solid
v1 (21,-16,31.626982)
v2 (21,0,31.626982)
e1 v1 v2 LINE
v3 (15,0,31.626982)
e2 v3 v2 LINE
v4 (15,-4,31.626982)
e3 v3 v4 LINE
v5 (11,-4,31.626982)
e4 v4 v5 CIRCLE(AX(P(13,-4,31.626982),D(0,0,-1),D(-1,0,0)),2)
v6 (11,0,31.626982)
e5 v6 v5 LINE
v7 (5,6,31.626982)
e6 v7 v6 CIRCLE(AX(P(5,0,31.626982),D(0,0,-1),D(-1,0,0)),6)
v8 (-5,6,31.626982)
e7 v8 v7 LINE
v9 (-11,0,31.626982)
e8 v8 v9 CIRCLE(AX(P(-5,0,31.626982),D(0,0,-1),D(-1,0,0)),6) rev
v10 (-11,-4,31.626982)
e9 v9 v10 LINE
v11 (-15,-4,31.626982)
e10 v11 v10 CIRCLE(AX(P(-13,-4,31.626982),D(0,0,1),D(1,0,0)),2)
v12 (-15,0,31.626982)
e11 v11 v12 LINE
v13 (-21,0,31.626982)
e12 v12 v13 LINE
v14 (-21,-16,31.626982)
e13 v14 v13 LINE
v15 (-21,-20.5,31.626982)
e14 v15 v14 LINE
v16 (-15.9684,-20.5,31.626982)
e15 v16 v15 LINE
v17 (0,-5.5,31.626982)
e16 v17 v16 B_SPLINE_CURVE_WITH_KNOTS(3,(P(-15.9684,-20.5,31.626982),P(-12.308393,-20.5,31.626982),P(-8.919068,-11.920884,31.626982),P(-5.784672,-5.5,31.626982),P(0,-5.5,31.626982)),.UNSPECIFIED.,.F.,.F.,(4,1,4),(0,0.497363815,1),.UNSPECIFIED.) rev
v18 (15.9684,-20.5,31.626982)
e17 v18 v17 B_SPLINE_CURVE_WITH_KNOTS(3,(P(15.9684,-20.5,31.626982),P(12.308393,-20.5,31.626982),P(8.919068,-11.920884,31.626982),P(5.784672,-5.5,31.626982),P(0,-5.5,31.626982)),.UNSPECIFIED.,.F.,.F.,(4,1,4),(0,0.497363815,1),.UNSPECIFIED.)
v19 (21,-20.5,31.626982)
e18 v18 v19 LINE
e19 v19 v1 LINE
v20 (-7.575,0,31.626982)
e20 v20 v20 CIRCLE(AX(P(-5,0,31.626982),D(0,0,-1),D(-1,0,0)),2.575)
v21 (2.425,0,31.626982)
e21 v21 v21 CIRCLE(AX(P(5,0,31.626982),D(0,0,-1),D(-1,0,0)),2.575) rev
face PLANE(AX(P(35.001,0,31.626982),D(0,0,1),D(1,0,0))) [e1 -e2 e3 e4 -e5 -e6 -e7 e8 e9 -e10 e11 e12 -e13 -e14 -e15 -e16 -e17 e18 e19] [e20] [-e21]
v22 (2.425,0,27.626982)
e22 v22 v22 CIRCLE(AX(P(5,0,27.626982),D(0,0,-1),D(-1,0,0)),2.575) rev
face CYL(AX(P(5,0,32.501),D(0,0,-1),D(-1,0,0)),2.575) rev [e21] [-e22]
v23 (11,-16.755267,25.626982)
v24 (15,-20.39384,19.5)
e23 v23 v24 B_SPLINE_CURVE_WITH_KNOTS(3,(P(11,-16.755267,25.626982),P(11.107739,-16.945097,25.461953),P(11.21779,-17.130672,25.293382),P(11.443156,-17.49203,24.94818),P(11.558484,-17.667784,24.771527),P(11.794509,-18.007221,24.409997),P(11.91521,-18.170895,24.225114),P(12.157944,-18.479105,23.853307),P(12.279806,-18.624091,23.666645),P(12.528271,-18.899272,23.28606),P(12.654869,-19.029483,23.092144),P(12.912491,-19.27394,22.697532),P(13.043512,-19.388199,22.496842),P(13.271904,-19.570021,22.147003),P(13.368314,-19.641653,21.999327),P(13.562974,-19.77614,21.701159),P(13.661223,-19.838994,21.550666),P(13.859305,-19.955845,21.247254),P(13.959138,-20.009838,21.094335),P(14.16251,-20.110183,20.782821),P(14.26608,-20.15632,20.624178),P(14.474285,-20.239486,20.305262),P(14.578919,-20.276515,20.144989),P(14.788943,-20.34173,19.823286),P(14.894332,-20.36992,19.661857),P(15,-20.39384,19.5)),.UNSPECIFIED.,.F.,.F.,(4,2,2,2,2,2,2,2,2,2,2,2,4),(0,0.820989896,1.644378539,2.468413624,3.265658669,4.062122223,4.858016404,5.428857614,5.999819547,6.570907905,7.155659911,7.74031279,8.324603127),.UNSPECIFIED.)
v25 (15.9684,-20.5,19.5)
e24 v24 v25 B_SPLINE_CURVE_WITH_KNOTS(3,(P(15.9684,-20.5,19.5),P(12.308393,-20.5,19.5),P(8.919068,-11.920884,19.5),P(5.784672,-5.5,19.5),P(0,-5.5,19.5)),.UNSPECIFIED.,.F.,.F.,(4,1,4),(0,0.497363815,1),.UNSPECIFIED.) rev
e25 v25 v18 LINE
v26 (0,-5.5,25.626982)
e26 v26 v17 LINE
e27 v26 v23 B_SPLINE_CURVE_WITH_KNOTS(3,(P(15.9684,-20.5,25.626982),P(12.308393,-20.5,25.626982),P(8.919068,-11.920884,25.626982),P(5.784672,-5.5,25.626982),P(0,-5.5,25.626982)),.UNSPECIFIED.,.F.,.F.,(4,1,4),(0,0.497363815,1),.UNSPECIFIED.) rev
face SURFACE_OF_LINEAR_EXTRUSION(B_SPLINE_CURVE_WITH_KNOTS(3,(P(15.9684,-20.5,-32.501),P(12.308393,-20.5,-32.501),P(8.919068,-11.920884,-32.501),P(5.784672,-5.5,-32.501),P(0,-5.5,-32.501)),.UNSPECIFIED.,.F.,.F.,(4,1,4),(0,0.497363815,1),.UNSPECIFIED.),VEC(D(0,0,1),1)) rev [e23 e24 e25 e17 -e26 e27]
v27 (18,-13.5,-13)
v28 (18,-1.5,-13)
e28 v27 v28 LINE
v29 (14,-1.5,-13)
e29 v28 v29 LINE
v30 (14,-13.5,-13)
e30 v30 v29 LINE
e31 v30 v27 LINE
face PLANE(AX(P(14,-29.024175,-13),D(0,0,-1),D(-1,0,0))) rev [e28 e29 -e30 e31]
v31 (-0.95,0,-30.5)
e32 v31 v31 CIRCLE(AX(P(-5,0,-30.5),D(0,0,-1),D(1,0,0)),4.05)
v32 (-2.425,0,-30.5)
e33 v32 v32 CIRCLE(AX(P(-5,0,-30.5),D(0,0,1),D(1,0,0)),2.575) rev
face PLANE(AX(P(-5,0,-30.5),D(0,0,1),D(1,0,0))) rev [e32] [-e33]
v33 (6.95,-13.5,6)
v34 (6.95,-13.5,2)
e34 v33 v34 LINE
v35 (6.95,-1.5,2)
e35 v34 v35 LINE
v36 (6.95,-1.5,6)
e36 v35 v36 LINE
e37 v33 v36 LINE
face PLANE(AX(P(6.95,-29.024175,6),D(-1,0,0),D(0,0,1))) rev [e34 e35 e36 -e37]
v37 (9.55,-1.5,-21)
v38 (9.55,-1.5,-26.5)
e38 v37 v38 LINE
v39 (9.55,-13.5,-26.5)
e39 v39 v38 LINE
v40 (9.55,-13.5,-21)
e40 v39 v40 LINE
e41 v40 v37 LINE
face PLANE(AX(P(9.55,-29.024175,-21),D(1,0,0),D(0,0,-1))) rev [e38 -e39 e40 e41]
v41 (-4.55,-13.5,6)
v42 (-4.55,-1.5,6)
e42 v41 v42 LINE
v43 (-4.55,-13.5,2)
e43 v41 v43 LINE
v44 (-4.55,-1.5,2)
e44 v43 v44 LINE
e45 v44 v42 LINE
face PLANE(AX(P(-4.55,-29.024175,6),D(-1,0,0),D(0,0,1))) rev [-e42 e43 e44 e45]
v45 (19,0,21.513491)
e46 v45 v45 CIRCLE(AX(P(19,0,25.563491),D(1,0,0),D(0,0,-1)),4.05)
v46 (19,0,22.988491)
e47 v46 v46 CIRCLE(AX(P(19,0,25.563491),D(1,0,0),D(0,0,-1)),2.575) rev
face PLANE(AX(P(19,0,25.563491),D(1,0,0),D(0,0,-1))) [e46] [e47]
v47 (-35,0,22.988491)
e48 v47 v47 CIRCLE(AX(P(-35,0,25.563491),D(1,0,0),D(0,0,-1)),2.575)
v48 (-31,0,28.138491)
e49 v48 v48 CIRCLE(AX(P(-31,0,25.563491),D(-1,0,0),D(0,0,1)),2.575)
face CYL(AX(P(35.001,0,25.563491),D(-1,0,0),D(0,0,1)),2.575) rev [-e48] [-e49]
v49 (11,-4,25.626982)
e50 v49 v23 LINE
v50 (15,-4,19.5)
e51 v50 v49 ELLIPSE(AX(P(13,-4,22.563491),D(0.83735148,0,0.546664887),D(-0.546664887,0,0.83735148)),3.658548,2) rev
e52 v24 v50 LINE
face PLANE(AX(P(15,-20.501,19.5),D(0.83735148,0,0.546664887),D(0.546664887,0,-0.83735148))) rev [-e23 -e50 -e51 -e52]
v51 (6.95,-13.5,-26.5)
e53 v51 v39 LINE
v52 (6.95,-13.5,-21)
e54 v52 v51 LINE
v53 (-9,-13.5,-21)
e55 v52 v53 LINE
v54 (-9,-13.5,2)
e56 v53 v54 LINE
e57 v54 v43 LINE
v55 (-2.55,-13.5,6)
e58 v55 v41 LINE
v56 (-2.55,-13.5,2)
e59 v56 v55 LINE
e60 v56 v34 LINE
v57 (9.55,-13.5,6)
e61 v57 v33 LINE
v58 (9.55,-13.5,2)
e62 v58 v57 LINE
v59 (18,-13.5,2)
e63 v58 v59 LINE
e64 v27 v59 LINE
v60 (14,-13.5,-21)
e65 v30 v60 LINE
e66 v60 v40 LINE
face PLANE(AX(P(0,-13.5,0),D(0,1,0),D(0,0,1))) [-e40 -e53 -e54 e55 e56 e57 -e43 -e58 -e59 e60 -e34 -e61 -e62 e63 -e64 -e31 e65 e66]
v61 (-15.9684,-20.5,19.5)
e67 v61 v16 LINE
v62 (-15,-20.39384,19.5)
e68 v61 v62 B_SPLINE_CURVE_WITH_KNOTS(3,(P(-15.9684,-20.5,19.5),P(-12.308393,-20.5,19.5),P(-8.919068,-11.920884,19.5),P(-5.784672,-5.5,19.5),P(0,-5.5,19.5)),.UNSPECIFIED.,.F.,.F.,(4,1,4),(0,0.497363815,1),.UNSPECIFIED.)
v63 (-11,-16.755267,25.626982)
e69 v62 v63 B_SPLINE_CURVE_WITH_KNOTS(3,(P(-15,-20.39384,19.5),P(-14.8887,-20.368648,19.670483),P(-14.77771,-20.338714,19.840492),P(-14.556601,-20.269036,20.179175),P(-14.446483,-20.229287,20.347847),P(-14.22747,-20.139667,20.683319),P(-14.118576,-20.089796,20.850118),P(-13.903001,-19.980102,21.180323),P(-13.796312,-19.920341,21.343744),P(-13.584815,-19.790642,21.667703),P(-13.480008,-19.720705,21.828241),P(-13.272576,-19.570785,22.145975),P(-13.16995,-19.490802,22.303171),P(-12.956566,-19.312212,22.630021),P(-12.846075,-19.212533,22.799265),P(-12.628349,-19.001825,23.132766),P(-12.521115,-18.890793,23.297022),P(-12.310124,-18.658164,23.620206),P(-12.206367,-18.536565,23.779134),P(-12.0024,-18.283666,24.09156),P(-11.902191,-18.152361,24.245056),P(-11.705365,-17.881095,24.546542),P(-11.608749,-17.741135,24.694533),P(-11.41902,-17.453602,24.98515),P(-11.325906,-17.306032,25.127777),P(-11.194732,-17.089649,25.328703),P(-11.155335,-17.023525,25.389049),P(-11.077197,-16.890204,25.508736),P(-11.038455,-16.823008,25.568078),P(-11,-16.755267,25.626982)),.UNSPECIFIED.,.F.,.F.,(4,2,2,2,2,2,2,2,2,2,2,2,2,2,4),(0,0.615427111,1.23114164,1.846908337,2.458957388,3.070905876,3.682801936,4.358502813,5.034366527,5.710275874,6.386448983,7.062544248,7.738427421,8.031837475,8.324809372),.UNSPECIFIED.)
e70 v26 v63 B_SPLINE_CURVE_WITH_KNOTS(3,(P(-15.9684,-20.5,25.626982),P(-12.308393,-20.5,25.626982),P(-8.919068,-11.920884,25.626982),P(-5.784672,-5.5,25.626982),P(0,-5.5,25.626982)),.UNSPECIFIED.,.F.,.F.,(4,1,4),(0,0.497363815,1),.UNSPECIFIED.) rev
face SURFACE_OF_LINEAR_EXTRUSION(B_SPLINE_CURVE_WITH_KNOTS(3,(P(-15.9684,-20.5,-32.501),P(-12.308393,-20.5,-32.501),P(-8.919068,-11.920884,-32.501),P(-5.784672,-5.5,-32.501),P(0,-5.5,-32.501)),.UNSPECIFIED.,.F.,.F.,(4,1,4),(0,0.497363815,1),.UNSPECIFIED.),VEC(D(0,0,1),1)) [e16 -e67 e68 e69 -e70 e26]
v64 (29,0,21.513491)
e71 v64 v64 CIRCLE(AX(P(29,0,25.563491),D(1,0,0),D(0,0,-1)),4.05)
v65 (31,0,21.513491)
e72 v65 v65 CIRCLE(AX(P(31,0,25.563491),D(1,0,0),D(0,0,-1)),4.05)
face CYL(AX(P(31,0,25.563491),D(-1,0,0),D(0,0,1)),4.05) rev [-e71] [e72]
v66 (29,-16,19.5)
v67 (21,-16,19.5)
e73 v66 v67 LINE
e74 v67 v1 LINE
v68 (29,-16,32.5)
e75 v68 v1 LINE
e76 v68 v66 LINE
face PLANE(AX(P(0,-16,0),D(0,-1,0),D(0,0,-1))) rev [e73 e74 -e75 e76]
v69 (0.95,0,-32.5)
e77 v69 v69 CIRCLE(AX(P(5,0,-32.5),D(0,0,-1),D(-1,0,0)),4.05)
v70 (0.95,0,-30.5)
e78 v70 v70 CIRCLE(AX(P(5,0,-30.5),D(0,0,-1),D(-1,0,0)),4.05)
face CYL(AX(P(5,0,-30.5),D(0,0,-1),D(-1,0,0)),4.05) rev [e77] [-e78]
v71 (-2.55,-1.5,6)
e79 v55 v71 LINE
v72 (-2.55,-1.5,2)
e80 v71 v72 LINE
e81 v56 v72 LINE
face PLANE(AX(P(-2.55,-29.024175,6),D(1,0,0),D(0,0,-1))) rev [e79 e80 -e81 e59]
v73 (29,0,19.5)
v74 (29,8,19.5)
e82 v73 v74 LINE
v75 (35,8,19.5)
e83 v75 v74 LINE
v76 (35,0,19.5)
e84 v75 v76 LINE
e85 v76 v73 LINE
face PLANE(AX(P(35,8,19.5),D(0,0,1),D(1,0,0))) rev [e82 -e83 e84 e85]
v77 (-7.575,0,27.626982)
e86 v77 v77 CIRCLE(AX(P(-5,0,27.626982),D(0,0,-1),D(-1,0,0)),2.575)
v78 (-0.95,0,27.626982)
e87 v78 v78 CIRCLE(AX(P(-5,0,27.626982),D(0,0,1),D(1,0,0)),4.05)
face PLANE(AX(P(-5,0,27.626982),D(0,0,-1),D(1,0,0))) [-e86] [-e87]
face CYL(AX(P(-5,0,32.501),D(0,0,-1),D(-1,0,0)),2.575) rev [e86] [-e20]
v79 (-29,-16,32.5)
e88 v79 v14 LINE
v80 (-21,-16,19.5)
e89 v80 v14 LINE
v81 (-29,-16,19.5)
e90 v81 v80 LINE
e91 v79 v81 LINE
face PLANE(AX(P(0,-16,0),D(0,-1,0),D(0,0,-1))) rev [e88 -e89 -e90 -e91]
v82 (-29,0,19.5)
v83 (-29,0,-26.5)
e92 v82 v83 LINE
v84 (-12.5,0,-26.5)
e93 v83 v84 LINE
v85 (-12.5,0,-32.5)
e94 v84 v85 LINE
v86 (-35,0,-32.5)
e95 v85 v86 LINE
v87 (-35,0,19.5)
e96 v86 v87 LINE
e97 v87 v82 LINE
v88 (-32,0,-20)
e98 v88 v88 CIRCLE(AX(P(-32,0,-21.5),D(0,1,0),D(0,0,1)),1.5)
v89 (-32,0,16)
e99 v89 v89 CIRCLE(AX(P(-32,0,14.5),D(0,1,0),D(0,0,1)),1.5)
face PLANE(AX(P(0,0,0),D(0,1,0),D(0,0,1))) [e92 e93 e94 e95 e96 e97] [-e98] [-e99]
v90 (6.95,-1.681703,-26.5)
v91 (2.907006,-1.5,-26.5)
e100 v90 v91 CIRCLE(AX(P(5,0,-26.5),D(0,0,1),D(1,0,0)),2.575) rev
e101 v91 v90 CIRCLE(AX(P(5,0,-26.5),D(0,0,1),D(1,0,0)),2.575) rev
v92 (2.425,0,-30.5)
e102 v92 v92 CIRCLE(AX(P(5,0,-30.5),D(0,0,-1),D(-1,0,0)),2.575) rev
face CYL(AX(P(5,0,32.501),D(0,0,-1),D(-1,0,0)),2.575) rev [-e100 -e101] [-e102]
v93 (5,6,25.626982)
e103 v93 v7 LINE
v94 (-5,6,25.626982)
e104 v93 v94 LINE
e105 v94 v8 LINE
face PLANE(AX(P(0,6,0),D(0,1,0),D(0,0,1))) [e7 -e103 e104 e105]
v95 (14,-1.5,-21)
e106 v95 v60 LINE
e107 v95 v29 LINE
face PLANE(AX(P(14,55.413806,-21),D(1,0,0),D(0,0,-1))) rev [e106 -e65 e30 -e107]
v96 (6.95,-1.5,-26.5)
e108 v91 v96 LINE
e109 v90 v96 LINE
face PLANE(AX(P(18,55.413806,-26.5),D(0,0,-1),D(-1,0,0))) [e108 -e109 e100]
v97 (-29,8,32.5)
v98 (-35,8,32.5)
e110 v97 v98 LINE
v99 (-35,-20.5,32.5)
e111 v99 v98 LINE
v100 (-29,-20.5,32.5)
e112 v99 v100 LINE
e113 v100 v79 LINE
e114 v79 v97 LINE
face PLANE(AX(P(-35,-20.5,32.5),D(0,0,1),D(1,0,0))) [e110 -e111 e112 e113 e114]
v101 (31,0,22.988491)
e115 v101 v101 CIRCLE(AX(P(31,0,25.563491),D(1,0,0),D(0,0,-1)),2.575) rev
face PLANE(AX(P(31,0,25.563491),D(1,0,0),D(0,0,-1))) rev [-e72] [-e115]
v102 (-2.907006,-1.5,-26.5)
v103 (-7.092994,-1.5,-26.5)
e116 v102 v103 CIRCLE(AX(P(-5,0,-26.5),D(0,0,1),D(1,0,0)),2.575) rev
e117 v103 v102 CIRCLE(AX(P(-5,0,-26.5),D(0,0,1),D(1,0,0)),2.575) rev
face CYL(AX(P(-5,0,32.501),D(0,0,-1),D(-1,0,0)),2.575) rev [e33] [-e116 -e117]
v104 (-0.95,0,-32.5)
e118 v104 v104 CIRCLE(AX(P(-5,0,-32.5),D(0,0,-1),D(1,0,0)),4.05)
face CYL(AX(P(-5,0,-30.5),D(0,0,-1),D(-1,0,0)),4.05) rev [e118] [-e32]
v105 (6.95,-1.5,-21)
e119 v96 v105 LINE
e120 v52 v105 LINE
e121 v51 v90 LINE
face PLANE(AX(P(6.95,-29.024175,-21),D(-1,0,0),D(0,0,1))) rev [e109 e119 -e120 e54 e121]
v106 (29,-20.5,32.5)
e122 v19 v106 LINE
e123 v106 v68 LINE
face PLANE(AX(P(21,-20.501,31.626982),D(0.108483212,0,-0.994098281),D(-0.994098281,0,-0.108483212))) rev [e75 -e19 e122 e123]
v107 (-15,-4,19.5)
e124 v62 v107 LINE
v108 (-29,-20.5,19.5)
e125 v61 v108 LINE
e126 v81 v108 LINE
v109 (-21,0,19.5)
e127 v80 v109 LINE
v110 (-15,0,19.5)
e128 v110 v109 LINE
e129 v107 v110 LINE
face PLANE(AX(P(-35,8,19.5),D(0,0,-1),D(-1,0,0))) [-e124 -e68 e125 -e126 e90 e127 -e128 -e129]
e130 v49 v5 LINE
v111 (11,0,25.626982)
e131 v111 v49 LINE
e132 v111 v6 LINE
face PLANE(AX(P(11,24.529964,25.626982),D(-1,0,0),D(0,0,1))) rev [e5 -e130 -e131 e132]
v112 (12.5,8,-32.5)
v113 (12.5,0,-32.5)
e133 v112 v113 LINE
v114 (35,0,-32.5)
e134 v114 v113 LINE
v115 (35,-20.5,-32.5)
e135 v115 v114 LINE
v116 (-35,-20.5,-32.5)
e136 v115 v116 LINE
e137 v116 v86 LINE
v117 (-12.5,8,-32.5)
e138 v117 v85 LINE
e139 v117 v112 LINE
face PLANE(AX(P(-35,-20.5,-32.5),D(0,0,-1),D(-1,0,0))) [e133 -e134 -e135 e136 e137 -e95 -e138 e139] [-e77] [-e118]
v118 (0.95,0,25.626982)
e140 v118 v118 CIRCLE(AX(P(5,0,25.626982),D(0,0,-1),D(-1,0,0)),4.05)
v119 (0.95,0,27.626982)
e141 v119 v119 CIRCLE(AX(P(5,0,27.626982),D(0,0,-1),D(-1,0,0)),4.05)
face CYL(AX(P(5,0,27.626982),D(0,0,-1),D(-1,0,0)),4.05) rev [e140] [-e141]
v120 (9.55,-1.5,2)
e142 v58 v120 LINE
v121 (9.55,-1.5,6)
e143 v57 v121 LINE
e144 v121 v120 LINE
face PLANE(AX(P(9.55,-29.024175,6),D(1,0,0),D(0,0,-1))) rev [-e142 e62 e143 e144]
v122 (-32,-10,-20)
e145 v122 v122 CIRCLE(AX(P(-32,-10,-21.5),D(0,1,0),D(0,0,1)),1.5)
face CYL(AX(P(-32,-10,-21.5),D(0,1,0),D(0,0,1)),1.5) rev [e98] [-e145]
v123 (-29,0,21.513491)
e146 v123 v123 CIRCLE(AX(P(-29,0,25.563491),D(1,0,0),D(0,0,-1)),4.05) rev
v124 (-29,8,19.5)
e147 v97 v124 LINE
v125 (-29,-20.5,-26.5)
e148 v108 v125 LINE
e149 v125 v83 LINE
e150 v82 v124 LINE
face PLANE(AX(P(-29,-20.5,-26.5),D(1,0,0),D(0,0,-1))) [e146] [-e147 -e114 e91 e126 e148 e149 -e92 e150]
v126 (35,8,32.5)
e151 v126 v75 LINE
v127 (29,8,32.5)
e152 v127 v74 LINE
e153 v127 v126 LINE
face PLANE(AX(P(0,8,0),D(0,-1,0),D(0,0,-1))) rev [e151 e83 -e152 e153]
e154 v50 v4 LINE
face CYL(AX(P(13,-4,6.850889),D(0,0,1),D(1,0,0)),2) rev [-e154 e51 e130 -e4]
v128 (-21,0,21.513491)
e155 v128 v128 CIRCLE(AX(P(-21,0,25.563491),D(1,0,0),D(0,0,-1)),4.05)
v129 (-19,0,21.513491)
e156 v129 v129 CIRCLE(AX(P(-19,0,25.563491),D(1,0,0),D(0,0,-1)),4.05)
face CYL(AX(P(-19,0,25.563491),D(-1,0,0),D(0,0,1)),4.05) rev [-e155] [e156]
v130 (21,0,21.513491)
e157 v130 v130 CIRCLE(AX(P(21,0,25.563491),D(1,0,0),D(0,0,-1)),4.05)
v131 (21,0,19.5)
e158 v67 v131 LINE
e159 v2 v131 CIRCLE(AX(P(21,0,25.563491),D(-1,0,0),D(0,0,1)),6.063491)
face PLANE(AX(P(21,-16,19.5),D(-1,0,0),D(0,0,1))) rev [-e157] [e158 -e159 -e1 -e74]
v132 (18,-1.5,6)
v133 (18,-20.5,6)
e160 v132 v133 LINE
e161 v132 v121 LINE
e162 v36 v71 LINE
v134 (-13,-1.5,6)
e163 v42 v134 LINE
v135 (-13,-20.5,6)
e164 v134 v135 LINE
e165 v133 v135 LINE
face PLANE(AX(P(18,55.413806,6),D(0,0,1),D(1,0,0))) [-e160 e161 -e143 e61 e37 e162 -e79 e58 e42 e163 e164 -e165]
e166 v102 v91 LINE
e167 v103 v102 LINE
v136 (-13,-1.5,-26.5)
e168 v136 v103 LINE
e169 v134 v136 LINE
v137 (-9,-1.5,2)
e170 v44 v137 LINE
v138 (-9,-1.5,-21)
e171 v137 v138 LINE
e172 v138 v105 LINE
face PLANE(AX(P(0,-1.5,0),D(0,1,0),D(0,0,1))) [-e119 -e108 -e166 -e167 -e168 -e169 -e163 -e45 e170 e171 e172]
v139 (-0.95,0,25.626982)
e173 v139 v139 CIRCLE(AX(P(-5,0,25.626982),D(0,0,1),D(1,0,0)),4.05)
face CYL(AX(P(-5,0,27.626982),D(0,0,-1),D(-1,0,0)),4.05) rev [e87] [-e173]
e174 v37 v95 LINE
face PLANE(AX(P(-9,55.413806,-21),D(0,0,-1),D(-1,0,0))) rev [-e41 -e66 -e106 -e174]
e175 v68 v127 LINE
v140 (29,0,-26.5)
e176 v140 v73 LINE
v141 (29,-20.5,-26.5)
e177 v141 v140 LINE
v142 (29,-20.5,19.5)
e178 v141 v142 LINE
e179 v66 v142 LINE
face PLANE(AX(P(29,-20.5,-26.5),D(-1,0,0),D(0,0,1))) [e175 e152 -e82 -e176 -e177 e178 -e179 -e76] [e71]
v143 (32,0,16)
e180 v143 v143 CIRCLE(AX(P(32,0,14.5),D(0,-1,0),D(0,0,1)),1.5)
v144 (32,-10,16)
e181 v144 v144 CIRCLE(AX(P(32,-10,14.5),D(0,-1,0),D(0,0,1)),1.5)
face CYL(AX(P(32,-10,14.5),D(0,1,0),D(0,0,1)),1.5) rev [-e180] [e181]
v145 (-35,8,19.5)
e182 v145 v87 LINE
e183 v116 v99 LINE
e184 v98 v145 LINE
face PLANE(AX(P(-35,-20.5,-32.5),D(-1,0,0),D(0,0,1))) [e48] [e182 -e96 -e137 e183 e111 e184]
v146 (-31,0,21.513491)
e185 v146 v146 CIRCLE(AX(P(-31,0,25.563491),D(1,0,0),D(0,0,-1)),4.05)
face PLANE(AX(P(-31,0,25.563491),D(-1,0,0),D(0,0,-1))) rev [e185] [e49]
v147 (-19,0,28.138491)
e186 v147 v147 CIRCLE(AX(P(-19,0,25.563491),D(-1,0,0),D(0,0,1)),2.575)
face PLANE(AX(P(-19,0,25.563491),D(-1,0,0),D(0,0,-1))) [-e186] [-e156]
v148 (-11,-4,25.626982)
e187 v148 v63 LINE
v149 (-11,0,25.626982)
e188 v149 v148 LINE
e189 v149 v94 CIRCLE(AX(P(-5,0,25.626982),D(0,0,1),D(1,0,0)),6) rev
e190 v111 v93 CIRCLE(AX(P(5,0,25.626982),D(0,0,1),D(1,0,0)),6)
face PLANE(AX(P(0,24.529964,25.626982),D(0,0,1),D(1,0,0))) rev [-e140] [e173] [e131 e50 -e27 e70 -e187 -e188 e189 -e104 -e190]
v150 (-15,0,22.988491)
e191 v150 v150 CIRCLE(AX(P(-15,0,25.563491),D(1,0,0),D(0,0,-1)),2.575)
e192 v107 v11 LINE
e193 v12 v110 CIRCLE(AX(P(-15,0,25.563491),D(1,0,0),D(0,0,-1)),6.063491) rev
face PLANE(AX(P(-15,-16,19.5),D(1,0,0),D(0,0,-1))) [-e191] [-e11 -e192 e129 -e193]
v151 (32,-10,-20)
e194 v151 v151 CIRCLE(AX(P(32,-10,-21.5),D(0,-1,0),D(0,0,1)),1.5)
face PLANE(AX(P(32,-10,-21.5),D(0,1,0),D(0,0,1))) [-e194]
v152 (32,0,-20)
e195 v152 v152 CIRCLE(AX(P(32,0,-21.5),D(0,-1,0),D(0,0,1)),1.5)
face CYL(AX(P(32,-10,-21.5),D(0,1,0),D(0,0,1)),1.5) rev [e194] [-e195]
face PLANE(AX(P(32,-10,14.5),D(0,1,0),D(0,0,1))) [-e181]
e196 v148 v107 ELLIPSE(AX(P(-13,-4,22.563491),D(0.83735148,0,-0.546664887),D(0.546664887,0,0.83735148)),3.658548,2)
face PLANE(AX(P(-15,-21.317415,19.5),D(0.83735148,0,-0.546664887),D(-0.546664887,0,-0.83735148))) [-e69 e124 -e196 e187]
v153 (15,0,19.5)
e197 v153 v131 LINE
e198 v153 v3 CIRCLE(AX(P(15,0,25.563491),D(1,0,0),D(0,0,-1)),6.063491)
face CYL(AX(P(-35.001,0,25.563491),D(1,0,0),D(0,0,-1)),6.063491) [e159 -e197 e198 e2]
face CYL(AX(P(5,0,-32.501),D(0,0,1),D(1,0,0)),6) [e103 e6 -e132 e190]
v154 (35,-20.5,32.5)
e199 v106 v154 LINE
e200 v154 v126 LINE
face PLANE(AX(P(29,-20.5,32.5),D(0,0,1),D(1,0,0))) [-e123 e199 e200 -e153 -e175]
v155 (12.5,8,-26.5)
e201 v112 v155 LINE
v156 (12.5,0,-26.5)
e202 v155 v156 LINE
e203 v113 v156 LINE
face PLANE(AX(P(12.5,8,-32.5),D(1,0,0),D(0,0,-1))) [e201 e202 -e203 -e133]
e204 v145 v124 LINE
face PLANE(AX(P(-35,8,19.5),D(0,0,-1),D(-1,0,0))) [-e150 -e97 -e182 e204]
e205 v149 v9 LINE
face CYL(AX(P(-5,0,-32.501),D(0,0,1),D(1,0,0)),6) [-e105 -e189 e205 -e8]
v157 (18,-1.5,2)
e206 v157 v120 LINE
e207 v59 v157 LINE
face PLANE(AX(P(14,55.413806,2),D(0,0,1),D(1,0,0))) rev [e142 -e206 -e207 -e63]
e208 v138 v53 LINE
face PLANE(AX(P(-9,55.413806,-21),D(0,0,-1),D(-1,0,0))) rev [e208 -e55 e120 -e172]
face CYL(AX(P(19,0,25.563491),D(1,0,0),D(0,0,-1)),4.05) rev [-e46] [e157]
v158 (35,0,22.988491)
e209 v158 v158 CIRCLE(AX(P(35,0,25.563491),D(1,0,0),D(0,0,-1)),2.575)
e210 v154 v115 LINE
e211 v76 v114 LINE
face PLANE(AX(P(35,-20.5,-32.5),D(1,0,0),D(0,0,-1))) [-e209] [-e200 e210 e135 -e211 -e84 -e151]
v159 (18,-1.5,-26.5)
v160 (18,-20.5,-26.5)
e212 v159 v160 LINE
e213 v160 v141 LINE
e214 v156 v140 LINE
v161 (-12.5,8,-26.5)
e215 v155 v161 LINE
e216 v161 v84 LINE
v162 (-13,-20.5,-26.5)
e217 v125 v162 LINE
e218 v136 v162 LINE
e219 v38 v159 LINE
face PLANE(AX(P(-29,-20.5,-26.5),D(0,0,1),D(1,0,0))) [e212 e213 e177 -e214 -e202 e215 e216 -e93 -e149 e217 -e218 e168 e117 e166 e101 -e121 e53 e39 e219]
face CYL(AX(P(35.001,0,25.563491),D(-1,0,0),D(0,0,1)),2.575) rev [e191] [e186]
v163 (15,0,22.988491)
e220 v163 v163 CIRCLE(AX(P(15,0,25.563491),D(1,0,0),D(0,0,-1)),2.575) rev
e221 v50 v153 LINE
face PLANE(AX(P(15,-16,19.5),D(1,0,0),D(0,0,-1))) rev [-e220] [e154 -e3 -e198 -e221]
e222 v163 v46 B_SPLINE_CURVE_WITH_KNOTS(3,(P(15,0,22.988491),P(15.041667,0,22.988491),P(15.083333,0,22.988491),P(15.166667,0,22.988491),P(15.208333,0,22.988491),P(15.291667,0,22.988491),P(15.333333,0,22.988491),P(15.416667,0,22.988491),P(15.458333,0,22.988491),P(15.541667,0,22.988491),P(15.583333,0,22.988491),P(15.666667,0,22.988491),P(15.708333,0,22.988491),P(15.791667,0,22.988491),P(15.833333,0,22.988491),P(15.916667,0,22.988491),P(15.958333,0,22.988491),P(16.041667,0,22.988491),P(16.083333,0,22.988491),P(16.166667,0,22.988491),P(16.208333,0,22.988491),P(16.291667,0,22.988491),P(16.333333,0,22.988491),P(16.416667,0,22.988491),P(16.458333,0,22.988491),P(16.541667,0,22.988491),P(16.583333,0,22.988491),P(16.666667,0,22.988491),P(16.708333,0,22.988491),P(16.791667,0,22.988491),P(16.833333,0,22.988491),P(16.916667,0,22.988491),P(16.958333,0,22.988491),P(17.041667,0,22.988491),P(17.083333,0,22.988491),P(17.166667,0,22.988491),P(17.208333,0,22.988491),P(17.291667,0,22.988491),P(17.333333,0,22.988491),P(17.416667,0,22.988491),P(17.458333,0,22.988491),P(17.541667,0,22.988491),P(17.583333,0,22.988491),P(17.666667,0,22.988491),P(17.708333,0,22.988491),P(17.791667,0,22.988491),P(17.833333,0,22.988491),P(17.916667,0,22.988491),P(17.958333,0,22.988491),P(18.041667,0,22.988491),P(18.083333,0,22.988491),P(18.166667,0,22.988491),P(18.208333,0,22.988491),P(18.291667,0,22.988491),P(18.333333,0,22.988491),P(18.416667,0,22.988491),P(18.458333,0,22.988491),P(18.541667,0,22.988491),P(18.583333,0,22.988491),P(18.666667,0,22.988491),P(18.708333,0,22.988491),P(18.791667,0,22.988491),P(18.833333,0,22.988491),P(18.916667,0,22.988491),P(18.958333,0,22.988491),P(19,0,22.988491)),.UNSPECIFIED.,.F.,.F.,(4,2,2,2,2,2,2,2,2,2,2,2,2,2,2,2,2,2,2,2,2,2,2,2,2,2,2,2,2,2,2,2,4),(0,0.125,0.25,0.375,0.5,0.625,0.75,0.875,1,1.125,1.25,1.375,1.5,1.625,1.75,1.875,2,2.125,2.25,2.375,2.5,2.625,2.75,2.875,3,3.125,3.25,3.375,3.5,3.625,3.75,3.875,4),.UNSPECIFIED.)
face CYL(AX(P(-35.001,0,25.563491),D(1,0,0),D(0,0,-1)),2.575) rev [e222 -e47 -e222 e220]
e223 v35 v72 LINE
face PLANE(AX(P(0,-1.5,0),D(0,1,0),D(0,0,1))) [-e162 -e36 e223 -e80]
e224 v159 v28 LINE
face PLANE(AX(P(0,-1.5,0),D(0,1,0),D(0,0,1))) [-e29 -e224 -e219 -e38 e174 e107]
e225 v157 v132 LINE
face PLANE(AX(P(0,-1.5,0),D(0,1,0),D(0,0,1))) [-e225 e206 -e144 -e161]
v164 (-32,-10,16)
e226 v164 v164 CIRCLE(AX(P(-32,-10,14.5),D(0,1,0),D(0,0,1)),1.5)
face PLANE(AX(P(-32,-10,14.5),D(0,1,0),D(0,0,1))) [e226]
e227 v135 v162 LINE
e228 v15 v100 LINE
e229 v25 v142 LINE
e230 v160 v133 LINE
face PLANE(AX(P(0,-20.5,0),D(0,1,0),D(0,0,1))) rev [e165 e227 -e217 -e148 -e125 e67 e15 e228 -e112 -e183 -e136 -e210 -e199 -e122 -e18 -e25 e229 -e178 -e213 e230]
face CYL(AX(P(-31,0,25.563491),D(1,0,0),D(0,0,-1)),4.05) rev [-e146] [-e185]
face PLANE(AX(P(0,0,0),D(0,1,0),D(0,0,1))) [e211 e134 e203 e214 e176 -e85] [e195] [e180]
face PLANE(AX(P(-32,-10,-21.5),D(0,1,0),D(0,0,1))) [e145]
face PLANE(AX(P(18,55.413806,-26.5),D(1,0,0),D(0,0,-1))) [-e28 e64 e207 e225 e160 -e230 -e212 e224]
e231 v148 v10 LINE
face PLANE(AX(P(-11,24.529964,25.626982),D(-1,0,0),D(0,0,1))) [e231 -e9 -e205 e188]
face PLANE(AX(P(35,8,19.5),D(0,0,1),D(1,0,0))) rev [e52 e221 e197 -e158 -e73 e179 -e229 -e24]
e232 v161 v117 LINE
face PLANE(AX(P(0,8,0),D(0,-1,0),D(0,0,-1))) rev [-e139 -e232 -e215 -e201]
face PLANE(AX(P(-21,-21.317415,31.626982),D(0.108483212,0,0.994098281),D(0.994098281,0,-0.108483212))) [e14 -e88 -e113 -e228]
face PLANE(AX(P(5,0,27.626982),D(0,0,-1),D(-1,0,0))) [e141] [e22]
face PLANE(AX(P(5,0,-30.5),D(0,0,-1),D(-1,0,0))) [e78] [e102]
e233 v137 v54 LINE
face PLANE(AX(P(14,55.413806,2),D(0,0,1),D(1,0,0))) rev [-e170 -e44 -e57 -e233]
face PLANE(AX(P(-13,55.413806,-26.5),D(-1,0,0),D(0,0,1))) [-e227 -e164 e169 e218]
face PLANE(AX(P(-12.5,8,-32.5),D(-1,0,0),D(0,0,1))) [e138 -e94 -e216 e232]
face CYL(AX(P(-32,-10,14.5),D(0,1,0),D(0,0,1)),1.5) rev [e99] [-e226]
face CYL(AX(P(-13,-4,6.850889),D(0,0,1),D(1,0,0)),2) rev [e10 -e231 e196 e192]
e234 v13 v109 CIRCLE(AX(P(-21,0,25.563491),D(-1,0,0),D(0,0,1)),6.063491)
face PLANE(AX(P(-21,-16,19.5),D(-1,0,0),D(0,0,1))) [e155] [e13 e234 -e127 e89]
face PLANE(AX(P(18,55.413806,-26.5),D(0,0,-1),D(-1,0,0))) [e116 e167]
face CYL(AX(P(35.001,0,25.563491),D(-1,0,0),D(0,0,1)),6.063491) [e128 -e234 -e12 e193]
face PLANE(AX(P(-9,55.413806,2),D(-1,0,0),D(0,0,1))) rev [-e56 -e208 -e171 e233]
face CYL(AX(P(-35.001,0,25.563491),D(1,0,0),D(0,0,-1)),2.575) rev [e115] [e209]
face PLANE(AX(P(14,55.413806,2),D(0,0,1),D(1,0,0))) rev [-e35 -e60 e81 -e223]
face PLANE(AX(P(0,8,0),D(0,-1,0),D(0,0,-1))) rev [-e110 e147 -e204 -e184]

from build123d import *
from build123d.topology import SkipClean

# Parameters (mm, degrees)
BOSS_EXTRUDE1_DEPTH   = 20.5
SKETCH2_W             = 25
SKETCH2_H             = 6
BOSS_EXTRUDE2_DEPTH   = 8
CUT_EXTRUDE1_REACH    = 78.618
SKETCH3_R             = 2.575
SKETCH4_R             = 4.05
CUT_EXTRUDE2_DEPTH    = 2
SKETCH5_W             = 23
SKETCH5_H             = 23
BOSS_EXTRUDE3_DEPTH   = 7
SKETCH16_W            = 31
SKETCH16_H            = 32.5
SKETCH16_W_2          = 23
SKETCH16_H_2          = 23
BOSS_EXTRUDE6_DEPTH   = 19
SKETCH18_W            = 2.6
SKETCH18_H            = 5.5
SKETCH18_H_2          = 4
SKETCH18_W_2          = 2
SKETCH18_W_3          = 4
SKETCH18_H_3          = 15
CUT_EXTRUDE10_DEPTH   = 12
SKETCH8_W             = 6
SKETCH8_H             = 13
BOSS_EXTRUDE4_DEPTH   = 8
CUT_EXTRUDE_X_REACH   = 81.853
SKETCH7_R             = 2.575
SKETCH9_R             = 4.05
CUT_EXTRUDE4_DEPTH    = 2
SKETCH10_W            = 29
SKETCH10_H            = 13
BOSS_EXTRUDE5_DEPTH   = 28.5
SKETCH12_W            = 8
SKETCH12_H            = 13
SKETCH12_W_2          = 15
CUT_EXTRUDE6_DEPTH    = 24
CUT_EXTRUDE7_REACH    = 69.915
SKETCH13_R            = 2.575
CUT_EXTRUDE8_START    = -2
SKETCH14_R            = 4.05
CUT_EXTRUDE8_DEPTH    = 2
CUT_EXTRUDE9_REACH    = 69.915
SKETCH23_W            = 11
SKETCH23_H            = 6
BOSS_EXTRUDE8_DEPTH   = 22
CUT_EXTRUDE12_REACH   = 67.949
SKETCH21_R            = 2.575
SKETCH22_R            = 4.05
CUT_EXTRUDE13_DEPTH   = 2
CUT_EXTRUDE14_REACH   = 78.618
BOSS_EXTRUDE9_REACH   = 77.878
CUT_EXTRUDE15_REACH   = 56.621
CUT_EXTRUDE16_REACH   = 78.618
CUT_EXTRUDE18_REACH   = 55.453
MIRROR1_START         = 19.5
MIRROR1_OUTLINE_R     = 4.05
MIRROR1_DEPTH         = 13
MIRROR1_START_2       = 27.626981996
MIRROR1_2_OUTLINE_R   = 4.05
MIRROR1_2_OUTLINE_R_2 = 2.575
MIRROR1_2_DEPTH       = 4
MIRROR1_START_3       = -11
MIRROR1_3_OUTLINE_W   = 6
MIRROR1_3_OUTLINE_H   = 0.873018004
MIRROR1_3_DEPTH       = 11
MIRROR1_START_4       = -35
MIRROR1_4_OUTLINE_R   = 2.575
MIRROR1_4_DEPTH       = 20
MIRROR1_START_5       = -31
MIRROR1_5_OUTLINE_R   = 4.05
MIRROR1_5_OUTLINE_R_2 = 2.575
MIRROR1_5_DEPTH       = 12
MIRROR1_START_6       = -21
MIRROR1_6_DEPTH       = 6
MIRROR1_START_7       = -19
MIRROR1_7_DEPTH       = 4
MIRROR1_8_DEPTH       = 21
SKETCH33_R            = 1.5
CUT_EXTRUDE19_DEPTH   = 10


with BuildPart() as part:
    # Sketch1 → Boss-Extrude1 (new body)
    with BuildSketch(Plane(origin=(0, 0, 0), x_dir=(1, 0, 0), z_dir=(0, 1, 0))):
        Polygon((-29, 26.5), (-29, -32.5), (-35, -32.5), (-35, 32.5), (35, 32.5), (35, -32.5), (29, -32.5), (29, 26.5), align=None)
    extrude(amount=-BOSS_EXTRUDE1_DEPTH)

    # Sketch2 → Boss-Extrude2 (add)
    with BuildSketch(Plane(origin=(0, 0, 0), x_dir=(-1, 0, 0), z_dir=(0, -1, 0))):
        with Locations((0, 29.5)):
            Rectangle(SKETCH2_W, SKETCH2_H)
    extrude(amount=-BOSS_EXTRUDE2_DEPTH)

    # Sketch3 → Cut-Extrude1 (cut, up to next)
    with BuildSketch(Plane(origin=(0, 0, -32.5), x_dir=(-1, 0, 0), z_dir=(0, 0, -1)), mode=Mode.PRIVATE) as cut_extrude1_sk1:
        with Locations((-5, 0)):
            Circle(SKETCH3_R)
    cut_extrude1_tool1 = extrude(cut_extrude1_sk1.sketch, amount=-CUT_EXTRUDE1_REACH, mode=Mode.PRIVATE) & part.part
    # Sketch3 → Cut-Extrude1 (cut, up to next)
    with BuildSketch(Plane(origin=(0, 0, -32.5), x_dir=(-1, 0, 0), z_dir=(0, 0, -1)), mode=Mode.PRIVATE) as cut_extrude1_sk2:
        with Locations(Location((5, 0, 0), (0, 0, 180))):
            Circle(SKETCH3_R)
    cut_extrude1_tool2 = extrude(cut_extrude1_sk2.sketch, amount=-CUT_EXTRUDE1_REACH, mode=Mode.PRIVATE) & part.part
    add(cut_extrude1_tool1.solids().sort_by_distance((5, 0, -32.5))[0], mode=Mode.SUBTRACT)
    add(cut_extrude1_tool2.solids().sort_by_distance((-5, 0, -32.5))[0], mode=Mode.SUBTRACT)

    # Sketch4 → Cut-Extrude2 (cut)
    with BuildSketch(Plane(origin=(0, 0, -32.5), x_dir=(-1, 0, 0), z_dir=(0, 0, -1))):
        with Locations((-5, 0)):
            Circle(SKETCH4_R)
        with Locations(Location((5, 0, 0), (0, 0, 180))):
            Circle(SKETCH4_R)
    extrude(amount=-CUT_EXTRUDE2_DEPTH, mode=Mode.SUBTRACT)



with BuildPart() as body_2:
    # Sketch5 → Boss-Extrude3 (new body)
    with BuildSketch(Plane(origin=(0, -20.5, 0), x_dir=(1, 0, 0), z_dir=(0, 1, 0))):
        with Locations((2.5, 9.5)):
            Rectangle(SKETCH5_W, SKETCH5_H)
    extrude(amount=BOSS_EXTRUDE3_DEPTH)


with BuildPart() as part_1:
    add(part.part)

    add(body_2.part)  # Boss-Extrude6 merges body 2
    # Sketch16 → Boss-Extrude6 (add)
    with BuildSketch(Plane.XZ.offset(20.5)):
        with Locations((2.5, -10.25)):
            Rectangle(SKETCH16_W, SKETCH16_H)
        with Locations((2.5, -9.5)):
            Rectangle(SKETCH16_W_2, SKETCH16_H_2, mode=Mode.SUBTRACT)
    extrude(amount=-BOSS_EXTRUDE6_DEPTH)

    # Sketch18 → Cut-Extrude10 (cut)
    with BuildSketch(Plane(origin=(0, -1.5, 0), x_dir=(1, 0, 0), z_dir=(0, 1, 0))):
        with Locations((8.25, 23.75)):
            Rectangle(SKETCH18_W, SKETCH18_H)
        with Locations((8.25, -4)):
            Rectangle(SKETCH18_W, SKETCH18_H_2)
        with Locations((-3.55, -4)):
            Rectangle(SKETCH18_W_2, SKETCH18_H_2)
        with Locations((16, 5.5)):
            Rectangle(SKETCH18_W_3, SKETCH18_H_3)
    extrude(amount=-CUT_EXTRUDE10_DEPTH, mode=Mode.SUBTRACT)

    # Sketch8 → Boss-Extrude4 (add)
    with BuildSketch(Plane(origin=(0, 0, 0), x_dir=(1, 0, 0), z_dir=(0, 1, 0))):
        with Locations((32, -26)):
            Rectangle(SKETCH8_W, SKETCH8_H)
    extrude(amount=BOSS_EXTRUDE4_DEPTH)

    # Sketch7 → Cut-Extrude x (cut, up to next)
    with BuildSketch(Plane(origin=(35, 0, 0), x_dir=(0, 0, -1), z_dir=(1, 0, 0)), mode=Mode.PRIVATE) as cut_extrude_x_sk1:
        with Locations((-25.563490998, 0)):
            Circle(SKETCH7_R)
    cut_extrude_x_tool1 = extrude(cut_extrude_x_sk1.sketch, amount=-CUT_EXTRUDE_X_REACH, mode=Mode.PRIVATE) & part_1.part
    add(cut_extrude_x_tool1.solids().sort_by_distance((35, 0, 25.563491))[0], mode=Mode.SUBTRACT)

    # Sketch9 → Cut-Extrude4 (cut)
    with BuildSketch(Plane(origin=(29, 0, 0), x_dir=(0, 0, -1), z_dir=(1, 0, 0))):
        with Locations((-25.563490998, 0)):
            Circle(SKETCH9_R)
    extrude(amount=CUT_EXTRUDE4_DEPTH, mode=Mode.SUBTRACT)

    # Sketch10 → Boss-Extrude5 (add)
    with BuildSketch(Plane.XZ.offset(20.5)):
        with Locations((14.5, 26)):
            Rectangle(SKETCH10_W, SKETCH10_H)
    extrude(amount=-BOSS_EXTRUDE5_DEPTH)

    # Sketch12 → Cut-Extrude6 (cut)
    with BuildSketch(Plane(origin=(0, 8, 0), x_dir=(1, 0, 0), z_dir=(0, 1, 0))):
        with Locations((25, -26)):
            Rectangle(SKETCH12_W, SKETCH12_H)
        with Locations((7.5, -26)):
            Rectangle(SKETCH12_W_2, SKETCH12_H)
    extrude(amount=-CUT_EXTRUDE6_DEPTH, mode=Mode.SUBTRACT)

    # Sketch13 → Cut-Extrude7 (cut, up to next)
    with BuildSketch(Plane(origin=(21, 0, 0), x_dir=(0, 0, -1), z_dir=(1, 0, 0)), mode=Mode.PRIVATE) as cut_extrude7_sk1:
        with Locations((-25.563490998, 0)):
            Circle(SKETCH13_R)
    cut_extrude7_tool1 = extrude(cut_extrude7_sk1.sketch, amount=-CUT_EXTRUDE7_REACH, mode=Mode.PRIVATE) & part_1.part
    add(cut_extrude7_tool1.solids().sort_by_distance((21, 0, 25.563491))[0], mode=Mode.SUBTRACT)

    # Sketch14 → Cut-Extrude8 (cut)
    with BuildSketch(Plane(origin=(21, 0, 0), x_dir=(0, 0, -1), z_dir=(1, 0, 0)).offset(CUT_EXTRUDE8_START)):
        with Locations((-25.563490998, 0)):
            Circle(SKETCH14_R)
    extrude(amount=CUT_EXTRUDE8_DEPTH, mode=Mode.SUBTRACT)

    # Sketch15 → Cut-Extrude9 (cut, up to next)
    with BuildSketch(Plane(origin=(21, 0, 0), x_dir=(0, 0, -1), z_dir=(1, 0, 0)), mode=Mode.PRIVATE) as cut_extrude9_sk1:
        with BuildLine():
            Line((-19.5, 8), (-19.5, 0))
            ThreePointArc((-19.5, 0), (-25.563490998, 6.063490998), (-31.626981996, 0))
            Line((-31.626981996, 0), (-31.626981996, -16))
            Line((-31.626981996, -16), (-32.5, -16))
            Line((-32.5, -16), (-32.5, 8))
            Line((-32.5, 8), (-19.5, 8))
        make_face()
    cut_extrude9_tool1 = extrude(cut_extrude9_sk1.sketch, amount=-CUT_EXTRUDE9_REACH, mode=Mode.PRIVATE) & part_1.part
    add(cut_extrude9_tool1.solids().sort_by_distance((21, 4, 19.772947))[0], mode=Mode.SUBTRACT)

    # Sketch23 → Boss-Extrude8 (add)
    with BuildSketch(Plane(origin=(0, -16, 0), x_dir=(1, 0, 0), z_dir=(0, 1, 0))):
        with Locations((5.5, -28.626981996)):
            Rectangle(SKETCH23_W, SKETCH23_H)
    extrude(amount=BOSS_EXTRUDE8_DEPTH)

    # Sketch21 → Cut-Extrude12 (cut, up to next)
    with BuildSketch(Plane(origin=(0, 0, 19.5), x_dir=(-1, 0, 0), z_dir=(0, 0, -1)), mode=Mode.PRIVATE) as cut_extrude12_sk1:
        with Locations((-5, 0)):
            Circle(SKETCH21_R)
    cut_extrude12_tool1 = extrude(cut_extrude12_sk1.sketch, amount=-CUT_EXTRUDE12_REACH, mode=Mode.PRIVATE) & part_1.part
    add(cut_extrude12_tool1.solids().sort_by_distance((5, 0, 19.5))[0], mode=Mode.SUBTRACT)

    # Sketch22 → Cut-Extrude13 (cut)
    with BuildSketch(Plane(origin=(0, 0, 25.626981996), x_dir=(-1, 0, 0), z_dir=(0, 0, -1))):
        with Locations((-5, 0)):
            Circle(SKETCH22_R)
    extrude(amount=-CUT_EXTRUDE13_DEPTH, mode=Mode.SUBTRACT)

    # Sketch25 → Cut-Extrude14 (cut, up to next)
    with BuildSketch(Plane.XY.offset(32.5), mode=Mode.PRIVATE) as cut_extrude14_sk1:
        with BuildLine():
            Line((5, 6), (11, 6))
            Line((11, 6), (11, 0))
            ThreePointArc((11, 0), (9.242640687, 4.242640687), (5, 6))
        make_face()
    cut_extrude14_tool1 = extrude(cut_extrude14_sk1.sketch, amount=-CUT_EXTRUDE14_REACH, mode=Mode.PRIVATE) & part_1.part
    add(cut_extrude14_tool1.solids().sort_by_distance((9.659792, 4.659792, 32.5))[0], mode=Mode.SUBTRACT)

    # Boss-Extrude9: up to this face of the body (flat: up to its plane)
    boss_extrude9_end = Plane(part_1.part.faces().sort_by_distance((15.983443709, -13.905629139, 19.5))[0])
    # Sketch26 → Boss-Extrude9 (add, up to the picked face)
    with BuildSketch(Plane.XY.offset(31.626981996), mode=Mode.PRIVATE) as boss_extrude9_sk1:
        with BuildLine():
            Line((11, -4), (11, -16))
            Line((11, -16), (15, -16))
            Line((15, -16), (15, -4))
            ThreePointArc((15, -4), (13, -6), (11, -4))
        make_face()
    boss_extrude9_tool1 = split(extrude(boss_extrude9_sk1.sketch, amount=-BOSS_EXTRUDE9_REACH, mode=Mode.PRIVATE), bisect_by=boss_extrude9_end, keep=Keep.BOTH, mode=Mode.PRIVATE)
    add(boss_extrude9_tool1.solids().sort_by(Axis((13, -10.775845, 31.626982), (0, 0, -1)))[0])

    # Sketch27 → Cut-Extrude15 (cut, up to next)
    with BuildSketch(Plane(origin=(0, 6, 0), x_dir=(1, 0, 0), z_dir=(0, 1, 0)), mode=Mode.PRIVATE) as cut_extrude15_sk1:
        Polygon((15, -19.5), (11, -25.626981996), (0, -25.626981996), (0, -19.5), align=None)
    cut_extrude15_tool1 = extrude(cut_extrude15_sk1.sketch, amount=-CUT_EXTRUDE15_REACH, mode=Mode.PRIVATE) & part_1.part
    add(cut_extrude15_tool1.solids().sort_by_distance((6.551282, 6, 22.406389))[0], mode=Mode.SUBTRACT)

    # Sketch28 → Cut-Extrude16 (cut, up to next)
    with BuildSketch(Plane.XY.offset(32.5), mode=Mode.PRIVATE) as cut_extrude16_sk1:
        with BuildLine():
            Line((0, -5.5), (0, -20.5))
            Line((0, -20.5), (15.968399563, -20.5))
            add(Edge.make_bspline(
                [(0, -5.5), (5.784672224, -5.5), (8.919068478, -11.920884454), (12.308392799, -20.5), (15.968399563, -20.5)],
                knots=[0, 0, 0, 0, 0.502636185, 1, 1, 1, 1], degree=3))
        make_face()
    cut_extrude16_tool1 = extrude(cut_extrude16_sk1.sketch, amount=-CUT_EXTRUDE16_REACH, mode=Mode.PRIVATE) & part_1.part
    add(cut_extrude16_tool1.solids().sort_by_distance((4.970773, -14.293365, 32.5))[0], mode=Mode.SUBTRACT)

    # Sketch32 → Cut-Extrude18 (cut, up to next)
    with BuildSketch(Plane(origin=(0, -16, 0), x_dir=(1, 0, 0), z_dir=(0, 1, 0)), mode=Mode.PRIVATE) as cut_extrude18_sk1:
        Polygon((10.593097258, -31.626981996), (21, -31.626981996), (29, -32.5), (10.593097258, -32.5), align=None)
    cut_extrude18_tool1 = extrude(cut_extrude18_sk1.sketch, amount=-CUT_EXTRUDE18_REACH, mode=Mode.PRIVATE) & part_1.part
    add(cut_extrude18_tool1.solids().sort_by_distance((17.981645, -16, 32.103889))[0], mode=Mode.SUBTRACT)

    # Mirror1: read off the stored shape, not the designer's step
    # Mirror1 outline → Mirror1 (add)
    # profile 1 of 2: a face of its own
    with BuildSketch(Plane.XY.offset(MIRROR1_START)):
        with BuildLine():
            Line((-29, -20.5), (-15.968399563, -20.5))
            add(Edge.make_bspline(
                [(-15.968399563, -20.5), (-12.308392799, -20.5), (-8.919068478, -11.920884454), (-5.784672224, -5.5), (0, -5.5)],
                knots=[0, 0, 0, 0, 0.497363815, 1, 1, 1, 1], degree=3))
            Line((0, -5.5), (0, 6))
            Line((0, 6), (-5, 6))
            ThreePointArc((-5, 6), (-9.242640687, 4.242640687), (-11, 0))
            Line((-11, 0), (-11, -4))
            ThreePointArc((-11, -4), (-13, -6), (-15, -4))
            Line((-15, -4), (-15, 0))
            Line((-15, 0), (-19, 0))
            Line((-19, 0), (-21, 0))
            Line((-21, 0), (-21, -16))
            Line((-21, -16), (-29, -16))
            Line((-29, -16), (-29, -20.5))
        make_face()
        with Locations((-5, 0)):
            Circle(MIRROR1_OUTLINE_R, mode=Mode.SUBTRACT)
    # profile 2 of 2: a face of its own
    with BuildSketch(Plane.XY.offset(MIRROR1_START)):
        Polygon((-35, 8), (-35, 0), (-31, 0), (-29, 0), (-29, 8), align=None)
    extrude(amount=MIRROR1_DEPTH)

    # Mirror1 2 outline → Mirror1 2 (add)
    with BuildSketch(Plane.XY.offset(MIRROR1_START_2)):
        with Locations((-5, 0)):
            Circle(MIRROR1_2_OUTLINE_R)
        with Locations((-5, 0)):
            Circle(MIRROR1_2_OUTLINE_R_2, mode=Mode.SUBTRACT)
    extrude(amount=MIRROR1_2_DEPTH)

    # Mirror1 3 outline → Mirror1 3 (cut)
    with BuildSketch(Plane.YZ.offset(MIRROR1_START_3)):
        with BuildLine():
            Line((6, 25.626981996), (-4.049502302, 25.626981996))
            ThreePointArc((-4.049502302, 25.626981996), (-2.886142628, 22.722244664), (0, 21.513490998))
            Line((0, 21.513490998), (0, 19.5))
            Line((0, 19.5), (6, 19.5))
            Line((6, 19.5), (6, 25.626981996))
        make_face()
        with Locations((3, 32.063490998)):
            Rectangle(MIRROR1_3_OUTLINE_W, MIRROR1_3_OUTLINE_H)
    extrude(amount=MIRROR1_3_DEPTH, mode=Mode.SUBTRACT)

    # Mirror1 4 outline → Mirror1 4 (cut)
    with BuildSketch(Plane.YZ.offset(MIRROR1_START_4)):
        with Locations((0, 25.563490998)):
            Circle(MIRROR1_4_OUTLINE_R)
    extrude(amount=MIRROR1_4_DEPTH, mode=Mode.SUBTRACT)

    # Mirror1 5 outline → Mirror1 5 (cut)
    with BuildSketch(Plane.YZ.offset(MIRROR1_START_5)):
        with Locations((0, 25.563490998)):
            Circle(MIRROR1_5_OUTLINE_R)
        with Locations((0, 25.563490998)):
            Circle(MIRROR1_5_OUTLINE_R_2, mode=Mode.SUBTRACT)
    extrude(amount=MIRROR1_5_DEPTH, mode=Mode.SUBTRACT)

    # Mirror1 6 outline → Mirror1 6 (add)
    with BuildSketch(Plane.YZ.offset(MIRROR1_START_6)):
        with BuildLine():
            ThreePointArc((0, 19.5), (6.063490998, 25.563490998), (0, 31.626981996))
            Line((0, 31.626981996), (0, 29.613490998))
            ThreePointArc((0, 29.613490998), (4.05, 25.563490998), (0, 21.513490998))
            Line((0, 21.513490998), (0, 19.5))
        make_face()
    extrude(amount=MIRROR1_6_DEPTH)

    # Mirror1 7 outline → Mirror1 7 (add)
    with SkipClean():  # the faces are left unmerged after this step: merging them gives an invalid solid
        with BuildSketch(Plane.YZ.offset(MIRROR1_START_7)):
            with BuildLine():
                Line((0, 29.613490998), (0, 28.138490998))
                ThreePointArc((0, 28.138490998), (2.575, 25.563490998), (0, 22.988490998))
                Line((0, 22.988490998), (0, 21.513490998))
                ThreePointArc((0, 21.513490998), (4.05, 25.563490998), (0, 29.613490998))
            make_face()
        extrude(amount=MIRROR1_7_DEPTH)
    add(part_1.part.scale(1), mode=Mode.REPLACE)  # the faces are merged on a copy

    # Mirror1 8 outline → Mirror1 8 (cut)
    with BuildSketch(Plane(origin=(0, 0, 0), x_dir=(1, 0, 0), z_dir=(0, 1, 0)).offset(MIRROR1_START_6)):
        Polygon((0, -19.5), (-15, -19.5), (-11, -25.626981996), (0, -25.626981996), align=None)
        Polygon((0, -31.626981996), (-21, -31.626981996), (-29, -32.5), (0, -32.5), align=None)
    extrude(amount=MIRROR1_8_DEPTH, mode=Mode.SUBTRACT)

    # Sketch33 → Cut-Extrude19 (cut)
    with BuildSketch(Plane(origin=(0, 0, 0), x_dir=(1, 0, 0), z_dir=(0, 1, 0))):
        with Locations(Location((-32, -14.5, 0), (0, 0, 270))):
            Circle(SKETCH33_R)
        with Locations(Location((-32, 21.5, 0), (0, 0, 270))):
            Circle(SKETCH33_R)
    cut_extrude19 = extrude(amount=-CUT_EXTRUDE19_DEPTH, mode=Mode.SUBTRACT)

    # Mirror2: Cut-Extrude19 across plane
    add(cut_extrude19.mirror(Plane(origin=(0, 0, 0), x_dir=(0, 0, 1), z_dir=(1, 0, 0))), mode=Mode.SUBTRACT)


solid = part_1.part
